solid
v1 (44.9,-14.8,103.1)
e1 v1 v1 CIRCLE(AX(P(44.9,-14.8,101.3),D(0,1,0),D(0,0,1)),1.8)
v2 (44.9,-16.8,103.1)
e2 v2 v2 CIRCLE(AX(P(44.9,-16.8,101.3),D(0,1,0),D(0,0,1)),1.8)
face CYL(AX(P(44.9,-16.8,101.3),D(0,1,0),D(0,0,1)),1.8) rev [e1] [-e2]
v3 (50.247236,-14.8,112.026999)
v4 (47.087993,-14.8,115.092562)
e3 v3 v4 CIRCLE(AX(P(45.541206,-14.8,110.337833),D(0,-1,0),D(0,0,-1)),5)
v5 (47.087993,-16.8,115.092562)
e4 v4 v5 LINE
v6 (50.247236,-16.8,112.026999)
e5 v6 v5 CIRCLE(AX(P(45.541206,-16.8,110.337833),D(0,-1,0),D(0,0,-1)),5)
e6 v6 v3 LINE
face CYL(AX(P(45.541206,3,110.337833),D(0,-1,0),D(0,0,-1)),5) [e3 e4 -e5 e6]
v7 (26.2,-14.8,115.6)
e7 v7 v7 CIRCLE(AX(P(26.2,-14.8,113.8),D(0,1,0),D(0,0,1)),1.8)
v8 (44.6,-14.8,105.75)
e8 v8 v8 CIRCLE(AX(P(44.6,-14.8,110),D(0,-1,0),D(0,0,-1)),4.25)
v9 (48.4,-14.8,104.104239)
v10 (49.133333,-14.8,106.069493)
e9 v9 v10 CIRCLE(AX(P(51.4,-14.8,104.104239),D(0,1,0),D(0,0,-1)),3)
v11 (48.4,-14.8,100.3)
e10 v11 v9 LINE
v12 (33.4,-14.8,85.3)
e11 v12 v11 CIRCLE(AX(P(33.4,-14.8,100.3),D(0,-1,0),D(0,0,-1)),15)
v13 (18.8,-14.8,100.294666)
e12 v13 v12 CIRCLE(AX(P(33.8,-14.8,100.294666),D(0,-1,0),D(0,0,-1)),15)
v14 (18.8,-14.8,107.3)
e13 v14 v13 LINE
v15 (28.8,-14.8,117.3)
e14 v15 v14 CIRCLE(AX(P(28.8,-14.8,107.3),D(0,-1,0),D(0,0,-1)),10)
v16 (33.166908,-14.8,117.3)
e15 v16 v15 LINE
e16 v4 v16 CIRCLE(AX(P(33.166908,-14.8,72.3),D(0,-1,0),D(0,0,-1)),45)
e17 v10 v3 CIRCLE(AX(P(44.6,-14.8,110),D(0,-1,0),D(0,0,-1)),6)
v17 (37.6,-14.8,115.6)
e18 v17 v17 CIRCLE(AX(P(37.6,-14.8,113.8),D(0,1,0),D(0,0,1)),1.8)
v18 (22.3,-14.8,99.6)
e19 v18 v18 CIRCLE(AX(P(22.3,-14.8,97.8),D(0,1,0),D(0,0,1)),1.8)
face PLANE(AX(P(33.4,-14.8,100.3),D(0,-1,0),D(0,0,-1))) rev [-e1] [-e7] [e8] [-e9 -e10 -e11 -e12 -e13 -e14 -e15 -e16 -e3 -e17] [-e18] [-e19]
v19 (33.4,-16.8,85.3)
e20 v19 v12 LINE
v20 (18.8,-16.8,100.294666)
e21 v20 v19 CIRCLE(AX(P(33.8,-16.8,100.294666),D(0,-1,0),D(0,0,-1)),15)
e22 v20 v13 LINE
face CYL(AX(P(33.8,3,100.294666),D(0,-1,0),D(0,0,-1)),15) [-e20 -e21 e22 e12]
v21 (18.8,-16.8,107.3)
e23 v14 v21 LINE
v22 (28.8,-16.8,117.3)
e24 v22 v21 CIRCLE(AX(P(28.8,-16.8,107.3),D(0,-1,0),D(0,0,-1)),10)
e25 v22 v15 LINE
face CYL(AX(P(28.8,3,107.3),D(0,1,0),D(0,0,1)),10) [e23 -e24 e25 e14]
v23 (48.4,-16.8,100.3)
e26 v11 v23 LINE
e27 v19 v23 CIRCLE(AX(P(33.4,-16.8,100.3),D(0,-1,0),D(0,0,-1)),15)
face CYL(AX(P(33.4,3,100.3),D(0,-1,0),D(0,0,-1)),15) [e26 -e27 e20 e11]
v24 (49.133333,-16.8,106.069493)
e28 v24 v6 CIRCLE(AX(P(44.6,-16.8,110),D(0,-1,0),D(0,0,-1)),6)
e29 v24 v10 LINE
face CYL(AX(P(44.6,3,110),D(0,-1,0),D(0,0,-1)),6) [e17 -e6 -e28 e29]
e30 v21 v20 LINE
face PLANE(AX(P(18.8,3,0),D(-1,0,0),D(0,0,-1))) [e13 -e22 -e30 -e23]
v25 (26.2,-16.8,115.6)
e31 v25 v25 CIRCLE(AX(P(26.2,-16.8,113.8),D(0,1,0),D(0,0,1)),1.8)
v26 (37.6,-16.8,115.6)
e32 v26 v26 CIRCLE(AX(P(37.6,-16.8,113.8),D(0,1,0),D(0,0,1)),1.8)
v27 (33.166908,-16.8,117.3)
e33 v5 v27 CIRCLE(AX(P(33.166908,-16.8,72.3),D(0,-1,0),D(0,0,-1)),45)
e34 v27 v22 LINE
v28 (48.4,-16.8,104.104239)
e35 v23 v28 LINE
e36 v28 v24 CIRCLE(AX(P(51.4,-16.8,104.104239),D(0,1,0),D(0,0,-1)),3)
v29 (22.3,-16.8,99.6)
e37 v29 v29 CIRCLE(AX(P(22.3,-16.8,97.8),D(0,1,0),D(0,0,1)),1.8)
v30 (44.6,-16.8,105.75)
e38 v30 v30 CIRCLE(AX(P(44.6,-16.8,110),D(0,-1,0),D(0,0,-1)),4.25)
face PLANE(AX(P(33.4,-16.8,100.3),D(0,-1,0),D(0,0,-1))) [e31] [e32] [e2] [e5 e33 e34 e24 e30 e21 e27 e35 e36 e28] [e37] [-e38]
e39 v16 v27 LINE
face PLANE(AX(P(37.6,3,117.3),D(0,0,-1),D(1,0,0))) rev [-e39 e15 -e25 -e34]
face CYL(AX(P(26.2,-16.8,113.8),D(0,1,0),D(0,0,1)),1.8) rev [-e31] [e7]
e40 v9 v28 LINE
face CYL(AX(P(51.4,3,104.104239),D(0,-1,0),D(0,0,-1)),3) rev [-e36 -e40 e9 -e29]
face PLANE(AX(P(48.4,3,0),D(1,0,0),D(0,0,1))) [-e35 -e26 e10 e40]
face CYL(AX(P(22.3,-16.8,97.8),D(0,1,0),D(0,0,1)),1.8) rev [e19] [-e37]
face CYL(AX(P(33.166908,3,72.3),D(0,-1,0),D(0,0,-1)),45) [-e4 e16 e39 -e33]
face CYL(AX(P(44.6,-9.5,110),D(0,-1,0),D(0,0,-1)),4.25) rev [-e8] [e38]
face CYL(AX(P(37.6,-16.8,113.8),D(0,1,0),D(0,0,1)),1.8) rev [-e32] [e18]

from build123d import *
from build123d.topology import SkipClean

# Parameters (mm, degrees)
SZKIC1_W                    = 15.6
SZKIC1_H                    = 25
SZKIC1_R                    = 1.8
SZKIC1_R_2                  = 1.5
DODANIE_WYCI_GNI_CIE1_DEPTH = 3
DODANIE_WYCI_GNI_CIE2_START = -10.5
SZKIC1_3_R                  = 1.8
SZKIC1_3_R_2                = 1.5
DODANIE_WYCI_GNI_CIE2_DEPTH = 10.5
ZAOKR_GLENIE1_R             = 10
ZAOKR_GLENIE6_R             = 45
ZAOKR_GLENIE7_R             = 5
ZAOKR_GLENIE8_R             = 15
ZAOKR_GLENIE10_R            = 0.2
SZKIC5_R                    = 4.25
WYTNIJ_WYCI_GNI_CIE3_DEPTH  = 1
ZAOKR_GLENIE11_R            = 1
ZAOKR_GLENIE12_START        = -10.5
ZAOKR_GLENIE12_DEPTH        = 13.5
ZAOKR_GLENIE13_R            = 3
DODANIE_WYCI_GNI_CIE3_START = 4.3
SZKIC8_R                    = 1.5
DODANIE_WYCI_GNI_CIE3_DEPTH = 4.3
WYTNIJ_WYCI_GNI_CIE5_DEPTH  = 129.982518339
SZKIC10_R                   = 3.3
WYTNIJ_WYCI_GNI_CIE6_DEPTH  = 1.6
SZKIC11_R                   = 1.8
DODANIE_WYCI_GNI_CIE4_DEPTH = 0.2
SZKIC12_R                   = 1.5
SZKIC12_R_2                 = 1.8
SZKIC12_R_3                 = 3.3
DODANIE_WYCI_GNI_CIE5_DEPTH = 0.2
ZAOKR_GLENIE14_R            = 3
SZKIC13_R                   = 1.5
SZKIC13_R_2                 = 4.25
DODANIE_WYCI_GNI_CIE6_DEPTH = 2
WYTNIJ_WYCI_GNI_CIE7_START  = -19.8
WYTNIJ_WYCI_GNI_CIE7_DEPTH  = 17.8
SZKIC15_R                   = 1.8
WYTNIJ_WYCI_GNI_CIE8_DEPTH  = 128.764040324


with BuildPart() as part:
    # Szkic1 → Dodanie-wyciągnięcie1 (new body)
    # profile 1 of 2: a face of its own
    with BuildSketch(Plane(origin=(0, 0, 0), x_dir=(1, 0, 0), z_dir=(0, 1, 0))):
        with Locations((4, -97.8)):
            Rectangle(SZKIC1_W, SZKIC1_H)
        with Locations(Location((4, -105.3, 0), (0, 0, 270))):
            Circle(SZKIC1_R, mode=Mode.SUBTRACT)
        with Locations(Location((4, -90.3, 0), (0, 0, 270))):
            Circle(SZKIC1_R, mode=Mode.SUBTRACT)
    # profile 2 of 2: a face of its own
    with BuildSketch(Plane(origin=(0, 0, 0), x_dir=(1, 0, 0), z_dir=(0, 1, 0))):
        with BuildLine():
            Line((11.8, -110.3), (-3.8, -110.3))
            Line((-3.8, -110.3), (-3.8, -85.3))
            Line((-3.8, -85.3), (-10.8, -85.3))
            Line((-10.8, -85.3), (-10.8, -105.356725294))
            ThreePointArc((-10.8, -105.356725294), (-13, -110), (-10.8, -114.643274706))
            Line((-10.8, -114.643274706), (-10.8, -117.3))
            Line((-10.8, -117.3), (18.8, -117.3))
            Line((18.8, -117.3), (18.8, -85.3))
            Line((18.8, -85.3), (11.8, -85.3))
            Line((11.8, -85.3), (11.8, -110.3))
        make_face()
        with Locations(Location((-7, -110, 0), (0, 0, 270))):
            Circle(SZKIC1_R, mode=Mode.SUBTRACT)
        with Locations(Location((0, -113.8, 0), (0, 0, 270))):
            Circle(SZKIC1_R_2, mode=Mode.SUBTRACT)
        with Locations(Location((11.4, -113.8, 0), (0, 0, 270))):
            Circle(SZKIC1_R_2, mode=Mode.SUBTRACT)
        with Locations(Location((-7.3, -101.3, 0), (0, 0, 270))):
            Circle(SZKIC1_R_2, mode=Mode.SUBTRACT)
        with Locations(Location((15.3, -97.8, 0), (0, 0, 270))):
            Circle(SZKIC1_R_2, mode=Mode.SUBTRACT)
    extrude(amount=DODANIE_WYCI_GNI_CIE1_DEPTH)

    # Szkic1<3> → Dodanie-wyciągnięcie2 (add)
    with BuildSketch(Plane(origin=(0, 0, 0), x_dir=(1, 0, 0), z_dir=(0, 1, 0)).offset(DODANIE_WYCI_GNI_CIE2_START)):
        with BuildLine():
            Line((11.8, -110.3), (-3.8, -110.3))
            Line((-3.8, -110.3), (-3.8, -85.3))
            Line((-3.8, -85.3), (-10.8, -85.3))
            Line((-10.8, -85.3), (-10.8, -105.356725294))
            ThreePointArc((-10.8, -105.356725294), (-13, -110), (-10.8, -114.643274706))
            Line((-10.8, -114.643274706), (-10.8, -117.3))
            Line((-10.8, -117.3), (18.8, -117.3))
            Line((18.8, -117.3), (18.8, -85.3))
            Line((18.8, -85.3), (11.8, -85.3))
            Line((11.8, -85.3), (11.8, -110.3))
        make_face()
        with Locations(Location((-7, -110, 0), (0, 0, 270))):
            Circle(SZKIC1_3_R, mode=Mode.SUBTRACT)
        with Locations(Location((0, -113.8, 0), (0, 0, 270))):
            Circle(SZKIC1_3_R_2, mode=Mode.SUBTRACT)
        with Locations(Location((11.4, -113.8, 0), (0, 0, 270))):
            Circle(SZKIC1_3_R_2, mode=Mode.SUBTRACT)
        with Locations(Location((-7.3, -101.3, 0), (0, 0, 270))):
            Circle(SZKIC1_3_R_2, mode=Mode.SUBTRACT)
        with Locations(Location((15.3, -97.8, 0), (0, 0, 270))):
            Circle(SZKIC1_3_R_2, mode=Mode.SUBTRACT)
    extrude(amount=DODANIE_WYCI_GNI_CIE2_DEPTH)

    # Zaokrąglenie1
    zaokr_glenie1_edges = [part.edges().sort_by_distance(p)[0] for p in [
        (18.8, -3.75, 117.3),
    ]]
    fillet(zaokr_glenie1_edges, radius=ZAOKR_GLENIE1_R)

    # Zaokrąglenie6
    # the kernel refuses this fillet: 45 mm, written as the material it takes off along each edge
    with BuildSketch(Plane(origin=(-10.8, 41.082729611, 117.3), x_dir=(1, 0, 0), z_dir=(0, -1, 0))) as zaokr_glenie6_piece_1:
        with BuildLine():
            CenterArc((15.233091844, -45), ZAOKR_GLENIE6_R, 90, 19.78631313)
            Line((0, -2.656725294), (0, 0))
            Line((0, 0), (15.233091844, 0))
        make_face()
    extrude(amount=89.665459221, mode=Mode.SUBTRACT)

    # Zaokrąglenie7
    zaokr_glenie7_edges = [part.edges().sort_by_distance(p)[0] for p in [
        (-10.8, -3.75, 114.643274706),
    ]]
    fillet(zaokr_glenie7_edges, radius=ZAOKR_GLENIE7_R)

    # Zaokrąglenie8
    zaokr_glenie8_edges = [part.edges().sort_by_distance(p)[0] for p in [
        (-10.8, -3.75, 85.3),
    ]]
    fillet(zaokr_glenie8_edges, radius=ZAOKR_GLENIE8_R)

    # Zaokrąglenie10
    zaokr_glenie10_edges = [part.edges().sort_by_distance(p)[0] for p in [
        (-3.8, -5.25, 110.3),
        (11.8, -5.25, 110.3),
    ]]
    fillet(zaokr_glenie10_edges, radius=ZAOKR_GLENIE10_R)

    # Szkic5 → Wytnij-wyciągnięcie3 (cut)
    with BuildSketch(Plane.XZ.offset(10.5)):
        with Locations((-7, 110)):
            Circle(SZKIC5_R)
    extrude(amount=-WYTNIJ_WYCI_GNI_CIE3_DEPTH, mode=Mode.SUBTRACT)

    # Zaokrąglenie11
    zaokr_glenie11_edges = [part.edges().sort_by_distance(p)[0] for p in [
        (-3.8, -10, 107.203126746),
        (-2.760601458, -10, 110.3),
    ]]
    fillet(zaokr_glenie11_edges, radius=ZAOKR_GLENIE11_R)

    # Zaokrąglenie12: read off the stored shape, not the designer's step
    # Zaokrąglenie12 outline → Zaokrąglenie12 (cut)
    with BuildSketch(Plane(origin=(0, 0, 0), x_dir=(1, 0, 0), z_dir=(0, 1, 0)).offset(ZAOKR_GLENIE12_START)):
        with BuildLine():
            Line((18.8, -85.3), (4.2, -85.3))
            ThreePointArc((4.2, -85.3), (14.54709263, -89.83044095), (18.8, -100.294665718))
            Line((18.8, -100.294665718), (18.8, -85.3))
        make_face()
    extrude(amount=ZAOKR_GLENIE12_DEPTH, mode=Mode.SUBTRACT)

    # Zaokrąglenie13
    zaokr_glenie13_edges = [part.edges().sort_by_distance(p)[0] for p in [
        (-3.8, -5.25, 87.61142246),
        (11.8, -5.25, 87.606088178),
    ]]
    fillet(zaokr_glenie13_edges, radius=ZAOKR_GLENIE13_R)

    # Szkic8 → Dodanie-wyciągnięcie3 (add)
    with SkipClean():  # the faces are left unmerged after this step: merging them gives an invalid solid
        with BuildSketch(Plane.XZ.offset(10.5).offset(DODANIE_WYCI_GNI_CIE3_START)):
            with BuildLine():
                Line((-3.8, 95.504168477), (-3.8, 105.233187648))
                ThreePointArc((-3.8, 105.233187648), (-4.261041569, 106.075520011), (-5.219047619, 106.141151905))
                ThreePointArc((-5.219047619, 106.141151905), (-10.837760193, 111.825950903), (-2.88235573, 111.052380952))
                ThreePointArc((-2.88235573, 111.052380952), (-2.52684194, 110.510183867), (-1.913498255, 110.3))
                Line((-1.913498255, 110.3), (11.6, 110.3))
                ThreePointArc((11.6, 110.3), (11.741421356, 110.241421356), (11.8, 110.1))
                Line((11.8, 110.1), (11.8, 95.498834195))
                ThreePointArc((11.8, 95.498834195), (14.187627564, 92.561999164), (17.55, 94.299876314))
                ThreePointArc((17.55, 94.299876314), (18.484175156, 97.23280354), (18.8, 100.294665718))
                Line((18.8, 100.294665718), (18.8, 107.3))
                ThreePointArc((18.8, 107.3), (15.871067812, 114.371067812), (8.8, 117.3))
                Line((8.8, 117.3), (4.433091844, 117.3))
                ThreePointArc((4.433091844, 117.3), (-2.614414646, 116.744714559), (-9.487993237, 115.092562323))
                ThreePointArc((-9.487993237, 115.092562323), (-11.423138006, 113.926168381), (-12.647236034, 112.026999056))
                ThreePointArc((-12.647236034, 112.026999056), (-12.782361558, 108.398658434), (-10.8, 105.356725294))
                Line((-10.8, 105.356725294), (-10.8, 100.3))
                ThreePointArc((-10.8, 100.3), (-10.484175156, 97.238137822), (-9.55, 94.305210596))
                ThreePointArc((-9.55, 94.305210596), (-6.187627564, 92.567333446), (-3.8, 95.504168477))
            make_face()
            with Locations(Location((15.3, 97.8, 0), (0, 0, 270))):
                Circle(SZKIC8_R, mode=Mode.SUBTRACT)
            with Locations(Location((11.4, 113.8, 0), (0, 0, 270))):
                Circle(SZKIC8_R, mode=Mode.SUBTRACT)
            with Locations(Location((-7.3, 101.3, 0), (0, 0, 270))):
                Circle(SZKIC8_R, mode=Mode.SUBTRACT)
            with Locations(Location((0, 113.8, 0), (0, 0, 270))):
                Circle(SZKIC8_R, mode=Mode.SUBTRACT)
        extrude(amount=-DODANIE_WYCI_GNI_CIE3_DEPTH)


with BuildPart() as body_2:
    # Lustro1: mirrored copy
    add(part.part.mirror(Plane(origin=(18.8, 3, 0), x_dir=(0, 0, 1), z_dir=(1, 0, 0))))

    # Szkic10 → Wytnij-wyciągnięcie6 (cut)
    with BuildSketch(Plane(origin=(0, 3, 0), x_dir=(1, 0, 0), z_dir=(0, 1, 0))):
        with Locations(Location((33.6, -105.3, 0), (0, 0, 270))):
            Circle(SZKIC10_R)
        with Locations(Location((33.6, -90.3, 0), (0, 0, 270))):
            Circle(SZKIC10_R)
    extrude(amount=-WYTNIJ_WYCI_GNI_CIE6_DEPTH, mode=Mode.SUBTRACT)

    # Szkic11 → Dodanie-wyciągnięcie4 (add)
    with BuildSketch(Plane(origin=(0, 1.4, 0), x_dir=(1, 0, 0), z_dir=(0, 1, 0))):
        with Locations(Location((33.6, -90.3, 0), (0, 0, 270))):
            Circle(SZKIC11_R)
        with Locations(Location((33.6, -105.3, 0), (0, 0, 270))):
            Circle(SZKIC11_R)
    extrude(amount=-DODANIE_WYCI_GNI_CIE4_DEPTH)

    # Szkic12 → Dodanie-wyciągnięcie5 (add)
    with BuildSketch(Plane(origin=(0, 3, 0), x_dir=(1, 0, 0), z_dir=(0, 1, 0))):
        with Locations(Location((44.9, -101.3, 0), (0, 0, 90))):
            Circle(SZKIC12_R)
        with Locations(Location((44.6, -110, 0), (0, 0, 90))):
            Circle(SZKIC12_R_2)
        with Locations(Location((37.6, -113.8, 0), (0, 0, 90))):
            Circle(SZKIC12_R)
        with Locations(Location((22.3, -97.8, 0), (0, 0, 90))):
            Circle(SZKIC12_R)
        with Locations(Location((26.2, -113.8, 0), (0, 0, 90))):
            Circle(SZKIC12_R)
        with Locations(Location((33.6, -90.3, 0), (0, 0, 270))):
            Circle(SZKIC12_R_3)
        with Locations(Location((33.6, -105.3, 0), (0, 0, 270))):
            Circle(SZKIC12_R_3)
    extrude(amount=-DODANIE_WYCI_GNI_CIE5_DEPTH)

    # Zaokrąglenie14
    zaokr_glenie14_edges = [body_2.edges().sort_by_distance(p)[0] for p in [
        (48.4, -3.75, 105.356725294),
    ]]
    fillet(zaokr_glenie14_edges, radius=ZAOKR_GLENIE14_R)

    # Szkic13 → Dodanie-wyciągnięcie6 (add)
    with BuildSketch(Plane.XZ.offset(14.8)):
        with BuildLine():
            Line((48.4, 100.3), (48.4, 104.104238811))
            ThreePointArc((48.4, 104.104238811), (48.589306135, 105.153047659), (49.133333333, 106.069492541))
            ThreePointArc((49.133333333, 106.069492541), (50.497793582, 108.897262104), (50.247236034, 112.026999056))
            ThreePointArc((50.247236034, 112.026999056), (49.023138006, 113.926168381), (47.087993237, 115.092562323))
            ThreePointArc((47.087993237, 115.092562323), (40.214414646, 116.744714559), (33.166908156, 117.3))
            Line((33.166908156, 117.3), (28.8, 117.3))
            ThreePointArc((28.8, 117.3), (21.728932188, 114.371067812), (18.8, 107.3))
            Line((18.8, 107.3), (18.8, 100.294665718))
            ThreePointArc((18.8, 100.294665718), (19.115824844, 97.23280354), (20.05, 94.299876314))
            ThreePointArc((20.05, 94.299876314), (25.41518823, 87.857023997), (33.4, 85.3))
            ThreePointArc((33.4, 85.3), (41.618216319, 87.751656662), (47.15, 94.305210596))
            ThreePointArc((47.15, 94.305210596), (48.084175156, 97.238137822), (48.4, 100.3))
        make_face()
        with Locations(Location((22.3, 97.8, 0), (0, 0, 270))):
            Circle(SZKIC13_R, mode=Mode.SUBTRACT)
        with Locations(Location((26.2, 113.8, 0), (0, 0, 270))):
            Circle(SZKIC13_R, mode=Mode.SUBTRACT)
        with Locations(Location((44.9, 101.3, 0), (0, 0, 270))):
            Circle(SZKIC13_R, mode=Mode.SUBTRACT)
        with Locations(Location((37.6, 113.8, 0), (0, 0, 270))):
            Circle(SZKIC13_R, mode=Mode.SUBTRACT)
        with Locations(Location((44.6, 110, 0), (0, 0, 270))):
            Circle(SZKIC13_R_2, mode=Mode.SUBTRACT)
    extrude(amount=DODANIE_WYCI_GNI_CIE6_DEPTH)

    # Szkic14 → Wytnij-wyciągnięcie7 (cut)
    with BuildSketch(Plane.XZ.offset(16.8).offset(WYTNIJ_WYCI_GNI_CIE7_START)):
        with BuildLine():
            Line((48.4, 100.3), (48.4, 104.104238811))
            ThreePointArc((48.4, 104.104238811), (48.589306135, 105.153047659), (49.133333333, 106.069492541))
            ThreePointArc((49.133333333, 106.069492541), (50.497793582, 108.897262104), (50.247236034, 112.026999056))
            ThreePointArc((50.247236034, 112.026999056), (49.023138006, 113.926168381), (47.087993237, 115.092562323))
            ThreePointArc((47.087993237, 115.092562323), (40.214414646, 116.744714559), (33.166908156, 117.3))
            Line((33.166908156, 117.3), (28.8, 117.3))
            ThreePointArc((28.8, 117.3), (21.728932188, 114.371067812), (18.8, 107.3))
            Line((18.8, 107.3), (18.8, 100.294665718))
            ThreePointArc((18.8, 100.294665718), (23.05290737, 89.83044095), (33.4, 85.3))
            ThreePointArc((33.4, 85.3), (44.006601718, 89.693398282), (48.4, 100.3))
        make_face()
    extrude(amount=WYTNIJ_WYCI_GNI_CIE7_DEPTH, mode=Mode.SUBTRACT)

    # Szkic15 → Wytnij-wyciągnięcie8 (cut, through all)
    with BuildSketch(Plane(origin=(0, -14.8, 0), x_dir=(1, 0, 0), z_dir=(0, 1, 0))):
        with Locations(Location((37.6, -113.8, 0), (0, 0, 270))):
            Circle(SZKIC15_R)
        with Locations(Location((26.2, -113.8, 0), (0, 0, 270))):
            Circle(SZKIC15_R)
        with Locations(Location((22.3, -97.8, 0), (0, 0, 270))):
            Circle(SZKIC15_R)
        with Locations(Location((44.9, -101.3, 0), (0, 0, 270))):
            Circle(SZKIC15_R)
    extrude(amount=-WYTNIJ_WYCI_GNI_CIE8_DEPTH, mode=Mode.SUBTRACT)


with BuildPart() as part_1:
    add(part.part)

    # Szkic9 → Wytnij-wyciągnięcie5 (cut, through all)
    with BuildSketch(Plane.XZ.offset(14.8)):
        with BuildLine():
            Line((18.8, 100.294665718), (18.8, 107.3))
            ThreePointArc((18.8, 107.3), (15.871067812, 114.371067812), (8.8, 117.3))
            Line((8.8, 117.3), (4.433091844, 117.3))
            ThreePointArc((4.433091844, 117.3), (-2.614414646, 116.744714559), (-9.487993237, 115.092562323))
            ThreePointArc((-9.487993237, 115.092562323), (-11.423138006, 113.926168381), (-12.647236034, 112.026999056))
            ThreePointArc((-12.647236034, 112.026999056), (-12.782361558, 108.398658434), (-10.8, 105.356725294))
            Line((-10.8, 105.356725294), (-10.8, 100.3))
            ThreePointArc((-10.8, 100.3), (-6.406601718, 89.693398282), (4.2, 85.3))
            ThreePointArc((4.2, 85.3), (14.54709263, 89.83044095), (18.8, 100.294665718))
        make_face()
    extrude(amount=-WYTNIJ_WYCI_GNI_CIE5_DEPTH, mode=Mode.SUBTRACT)


solid = body_2.part
